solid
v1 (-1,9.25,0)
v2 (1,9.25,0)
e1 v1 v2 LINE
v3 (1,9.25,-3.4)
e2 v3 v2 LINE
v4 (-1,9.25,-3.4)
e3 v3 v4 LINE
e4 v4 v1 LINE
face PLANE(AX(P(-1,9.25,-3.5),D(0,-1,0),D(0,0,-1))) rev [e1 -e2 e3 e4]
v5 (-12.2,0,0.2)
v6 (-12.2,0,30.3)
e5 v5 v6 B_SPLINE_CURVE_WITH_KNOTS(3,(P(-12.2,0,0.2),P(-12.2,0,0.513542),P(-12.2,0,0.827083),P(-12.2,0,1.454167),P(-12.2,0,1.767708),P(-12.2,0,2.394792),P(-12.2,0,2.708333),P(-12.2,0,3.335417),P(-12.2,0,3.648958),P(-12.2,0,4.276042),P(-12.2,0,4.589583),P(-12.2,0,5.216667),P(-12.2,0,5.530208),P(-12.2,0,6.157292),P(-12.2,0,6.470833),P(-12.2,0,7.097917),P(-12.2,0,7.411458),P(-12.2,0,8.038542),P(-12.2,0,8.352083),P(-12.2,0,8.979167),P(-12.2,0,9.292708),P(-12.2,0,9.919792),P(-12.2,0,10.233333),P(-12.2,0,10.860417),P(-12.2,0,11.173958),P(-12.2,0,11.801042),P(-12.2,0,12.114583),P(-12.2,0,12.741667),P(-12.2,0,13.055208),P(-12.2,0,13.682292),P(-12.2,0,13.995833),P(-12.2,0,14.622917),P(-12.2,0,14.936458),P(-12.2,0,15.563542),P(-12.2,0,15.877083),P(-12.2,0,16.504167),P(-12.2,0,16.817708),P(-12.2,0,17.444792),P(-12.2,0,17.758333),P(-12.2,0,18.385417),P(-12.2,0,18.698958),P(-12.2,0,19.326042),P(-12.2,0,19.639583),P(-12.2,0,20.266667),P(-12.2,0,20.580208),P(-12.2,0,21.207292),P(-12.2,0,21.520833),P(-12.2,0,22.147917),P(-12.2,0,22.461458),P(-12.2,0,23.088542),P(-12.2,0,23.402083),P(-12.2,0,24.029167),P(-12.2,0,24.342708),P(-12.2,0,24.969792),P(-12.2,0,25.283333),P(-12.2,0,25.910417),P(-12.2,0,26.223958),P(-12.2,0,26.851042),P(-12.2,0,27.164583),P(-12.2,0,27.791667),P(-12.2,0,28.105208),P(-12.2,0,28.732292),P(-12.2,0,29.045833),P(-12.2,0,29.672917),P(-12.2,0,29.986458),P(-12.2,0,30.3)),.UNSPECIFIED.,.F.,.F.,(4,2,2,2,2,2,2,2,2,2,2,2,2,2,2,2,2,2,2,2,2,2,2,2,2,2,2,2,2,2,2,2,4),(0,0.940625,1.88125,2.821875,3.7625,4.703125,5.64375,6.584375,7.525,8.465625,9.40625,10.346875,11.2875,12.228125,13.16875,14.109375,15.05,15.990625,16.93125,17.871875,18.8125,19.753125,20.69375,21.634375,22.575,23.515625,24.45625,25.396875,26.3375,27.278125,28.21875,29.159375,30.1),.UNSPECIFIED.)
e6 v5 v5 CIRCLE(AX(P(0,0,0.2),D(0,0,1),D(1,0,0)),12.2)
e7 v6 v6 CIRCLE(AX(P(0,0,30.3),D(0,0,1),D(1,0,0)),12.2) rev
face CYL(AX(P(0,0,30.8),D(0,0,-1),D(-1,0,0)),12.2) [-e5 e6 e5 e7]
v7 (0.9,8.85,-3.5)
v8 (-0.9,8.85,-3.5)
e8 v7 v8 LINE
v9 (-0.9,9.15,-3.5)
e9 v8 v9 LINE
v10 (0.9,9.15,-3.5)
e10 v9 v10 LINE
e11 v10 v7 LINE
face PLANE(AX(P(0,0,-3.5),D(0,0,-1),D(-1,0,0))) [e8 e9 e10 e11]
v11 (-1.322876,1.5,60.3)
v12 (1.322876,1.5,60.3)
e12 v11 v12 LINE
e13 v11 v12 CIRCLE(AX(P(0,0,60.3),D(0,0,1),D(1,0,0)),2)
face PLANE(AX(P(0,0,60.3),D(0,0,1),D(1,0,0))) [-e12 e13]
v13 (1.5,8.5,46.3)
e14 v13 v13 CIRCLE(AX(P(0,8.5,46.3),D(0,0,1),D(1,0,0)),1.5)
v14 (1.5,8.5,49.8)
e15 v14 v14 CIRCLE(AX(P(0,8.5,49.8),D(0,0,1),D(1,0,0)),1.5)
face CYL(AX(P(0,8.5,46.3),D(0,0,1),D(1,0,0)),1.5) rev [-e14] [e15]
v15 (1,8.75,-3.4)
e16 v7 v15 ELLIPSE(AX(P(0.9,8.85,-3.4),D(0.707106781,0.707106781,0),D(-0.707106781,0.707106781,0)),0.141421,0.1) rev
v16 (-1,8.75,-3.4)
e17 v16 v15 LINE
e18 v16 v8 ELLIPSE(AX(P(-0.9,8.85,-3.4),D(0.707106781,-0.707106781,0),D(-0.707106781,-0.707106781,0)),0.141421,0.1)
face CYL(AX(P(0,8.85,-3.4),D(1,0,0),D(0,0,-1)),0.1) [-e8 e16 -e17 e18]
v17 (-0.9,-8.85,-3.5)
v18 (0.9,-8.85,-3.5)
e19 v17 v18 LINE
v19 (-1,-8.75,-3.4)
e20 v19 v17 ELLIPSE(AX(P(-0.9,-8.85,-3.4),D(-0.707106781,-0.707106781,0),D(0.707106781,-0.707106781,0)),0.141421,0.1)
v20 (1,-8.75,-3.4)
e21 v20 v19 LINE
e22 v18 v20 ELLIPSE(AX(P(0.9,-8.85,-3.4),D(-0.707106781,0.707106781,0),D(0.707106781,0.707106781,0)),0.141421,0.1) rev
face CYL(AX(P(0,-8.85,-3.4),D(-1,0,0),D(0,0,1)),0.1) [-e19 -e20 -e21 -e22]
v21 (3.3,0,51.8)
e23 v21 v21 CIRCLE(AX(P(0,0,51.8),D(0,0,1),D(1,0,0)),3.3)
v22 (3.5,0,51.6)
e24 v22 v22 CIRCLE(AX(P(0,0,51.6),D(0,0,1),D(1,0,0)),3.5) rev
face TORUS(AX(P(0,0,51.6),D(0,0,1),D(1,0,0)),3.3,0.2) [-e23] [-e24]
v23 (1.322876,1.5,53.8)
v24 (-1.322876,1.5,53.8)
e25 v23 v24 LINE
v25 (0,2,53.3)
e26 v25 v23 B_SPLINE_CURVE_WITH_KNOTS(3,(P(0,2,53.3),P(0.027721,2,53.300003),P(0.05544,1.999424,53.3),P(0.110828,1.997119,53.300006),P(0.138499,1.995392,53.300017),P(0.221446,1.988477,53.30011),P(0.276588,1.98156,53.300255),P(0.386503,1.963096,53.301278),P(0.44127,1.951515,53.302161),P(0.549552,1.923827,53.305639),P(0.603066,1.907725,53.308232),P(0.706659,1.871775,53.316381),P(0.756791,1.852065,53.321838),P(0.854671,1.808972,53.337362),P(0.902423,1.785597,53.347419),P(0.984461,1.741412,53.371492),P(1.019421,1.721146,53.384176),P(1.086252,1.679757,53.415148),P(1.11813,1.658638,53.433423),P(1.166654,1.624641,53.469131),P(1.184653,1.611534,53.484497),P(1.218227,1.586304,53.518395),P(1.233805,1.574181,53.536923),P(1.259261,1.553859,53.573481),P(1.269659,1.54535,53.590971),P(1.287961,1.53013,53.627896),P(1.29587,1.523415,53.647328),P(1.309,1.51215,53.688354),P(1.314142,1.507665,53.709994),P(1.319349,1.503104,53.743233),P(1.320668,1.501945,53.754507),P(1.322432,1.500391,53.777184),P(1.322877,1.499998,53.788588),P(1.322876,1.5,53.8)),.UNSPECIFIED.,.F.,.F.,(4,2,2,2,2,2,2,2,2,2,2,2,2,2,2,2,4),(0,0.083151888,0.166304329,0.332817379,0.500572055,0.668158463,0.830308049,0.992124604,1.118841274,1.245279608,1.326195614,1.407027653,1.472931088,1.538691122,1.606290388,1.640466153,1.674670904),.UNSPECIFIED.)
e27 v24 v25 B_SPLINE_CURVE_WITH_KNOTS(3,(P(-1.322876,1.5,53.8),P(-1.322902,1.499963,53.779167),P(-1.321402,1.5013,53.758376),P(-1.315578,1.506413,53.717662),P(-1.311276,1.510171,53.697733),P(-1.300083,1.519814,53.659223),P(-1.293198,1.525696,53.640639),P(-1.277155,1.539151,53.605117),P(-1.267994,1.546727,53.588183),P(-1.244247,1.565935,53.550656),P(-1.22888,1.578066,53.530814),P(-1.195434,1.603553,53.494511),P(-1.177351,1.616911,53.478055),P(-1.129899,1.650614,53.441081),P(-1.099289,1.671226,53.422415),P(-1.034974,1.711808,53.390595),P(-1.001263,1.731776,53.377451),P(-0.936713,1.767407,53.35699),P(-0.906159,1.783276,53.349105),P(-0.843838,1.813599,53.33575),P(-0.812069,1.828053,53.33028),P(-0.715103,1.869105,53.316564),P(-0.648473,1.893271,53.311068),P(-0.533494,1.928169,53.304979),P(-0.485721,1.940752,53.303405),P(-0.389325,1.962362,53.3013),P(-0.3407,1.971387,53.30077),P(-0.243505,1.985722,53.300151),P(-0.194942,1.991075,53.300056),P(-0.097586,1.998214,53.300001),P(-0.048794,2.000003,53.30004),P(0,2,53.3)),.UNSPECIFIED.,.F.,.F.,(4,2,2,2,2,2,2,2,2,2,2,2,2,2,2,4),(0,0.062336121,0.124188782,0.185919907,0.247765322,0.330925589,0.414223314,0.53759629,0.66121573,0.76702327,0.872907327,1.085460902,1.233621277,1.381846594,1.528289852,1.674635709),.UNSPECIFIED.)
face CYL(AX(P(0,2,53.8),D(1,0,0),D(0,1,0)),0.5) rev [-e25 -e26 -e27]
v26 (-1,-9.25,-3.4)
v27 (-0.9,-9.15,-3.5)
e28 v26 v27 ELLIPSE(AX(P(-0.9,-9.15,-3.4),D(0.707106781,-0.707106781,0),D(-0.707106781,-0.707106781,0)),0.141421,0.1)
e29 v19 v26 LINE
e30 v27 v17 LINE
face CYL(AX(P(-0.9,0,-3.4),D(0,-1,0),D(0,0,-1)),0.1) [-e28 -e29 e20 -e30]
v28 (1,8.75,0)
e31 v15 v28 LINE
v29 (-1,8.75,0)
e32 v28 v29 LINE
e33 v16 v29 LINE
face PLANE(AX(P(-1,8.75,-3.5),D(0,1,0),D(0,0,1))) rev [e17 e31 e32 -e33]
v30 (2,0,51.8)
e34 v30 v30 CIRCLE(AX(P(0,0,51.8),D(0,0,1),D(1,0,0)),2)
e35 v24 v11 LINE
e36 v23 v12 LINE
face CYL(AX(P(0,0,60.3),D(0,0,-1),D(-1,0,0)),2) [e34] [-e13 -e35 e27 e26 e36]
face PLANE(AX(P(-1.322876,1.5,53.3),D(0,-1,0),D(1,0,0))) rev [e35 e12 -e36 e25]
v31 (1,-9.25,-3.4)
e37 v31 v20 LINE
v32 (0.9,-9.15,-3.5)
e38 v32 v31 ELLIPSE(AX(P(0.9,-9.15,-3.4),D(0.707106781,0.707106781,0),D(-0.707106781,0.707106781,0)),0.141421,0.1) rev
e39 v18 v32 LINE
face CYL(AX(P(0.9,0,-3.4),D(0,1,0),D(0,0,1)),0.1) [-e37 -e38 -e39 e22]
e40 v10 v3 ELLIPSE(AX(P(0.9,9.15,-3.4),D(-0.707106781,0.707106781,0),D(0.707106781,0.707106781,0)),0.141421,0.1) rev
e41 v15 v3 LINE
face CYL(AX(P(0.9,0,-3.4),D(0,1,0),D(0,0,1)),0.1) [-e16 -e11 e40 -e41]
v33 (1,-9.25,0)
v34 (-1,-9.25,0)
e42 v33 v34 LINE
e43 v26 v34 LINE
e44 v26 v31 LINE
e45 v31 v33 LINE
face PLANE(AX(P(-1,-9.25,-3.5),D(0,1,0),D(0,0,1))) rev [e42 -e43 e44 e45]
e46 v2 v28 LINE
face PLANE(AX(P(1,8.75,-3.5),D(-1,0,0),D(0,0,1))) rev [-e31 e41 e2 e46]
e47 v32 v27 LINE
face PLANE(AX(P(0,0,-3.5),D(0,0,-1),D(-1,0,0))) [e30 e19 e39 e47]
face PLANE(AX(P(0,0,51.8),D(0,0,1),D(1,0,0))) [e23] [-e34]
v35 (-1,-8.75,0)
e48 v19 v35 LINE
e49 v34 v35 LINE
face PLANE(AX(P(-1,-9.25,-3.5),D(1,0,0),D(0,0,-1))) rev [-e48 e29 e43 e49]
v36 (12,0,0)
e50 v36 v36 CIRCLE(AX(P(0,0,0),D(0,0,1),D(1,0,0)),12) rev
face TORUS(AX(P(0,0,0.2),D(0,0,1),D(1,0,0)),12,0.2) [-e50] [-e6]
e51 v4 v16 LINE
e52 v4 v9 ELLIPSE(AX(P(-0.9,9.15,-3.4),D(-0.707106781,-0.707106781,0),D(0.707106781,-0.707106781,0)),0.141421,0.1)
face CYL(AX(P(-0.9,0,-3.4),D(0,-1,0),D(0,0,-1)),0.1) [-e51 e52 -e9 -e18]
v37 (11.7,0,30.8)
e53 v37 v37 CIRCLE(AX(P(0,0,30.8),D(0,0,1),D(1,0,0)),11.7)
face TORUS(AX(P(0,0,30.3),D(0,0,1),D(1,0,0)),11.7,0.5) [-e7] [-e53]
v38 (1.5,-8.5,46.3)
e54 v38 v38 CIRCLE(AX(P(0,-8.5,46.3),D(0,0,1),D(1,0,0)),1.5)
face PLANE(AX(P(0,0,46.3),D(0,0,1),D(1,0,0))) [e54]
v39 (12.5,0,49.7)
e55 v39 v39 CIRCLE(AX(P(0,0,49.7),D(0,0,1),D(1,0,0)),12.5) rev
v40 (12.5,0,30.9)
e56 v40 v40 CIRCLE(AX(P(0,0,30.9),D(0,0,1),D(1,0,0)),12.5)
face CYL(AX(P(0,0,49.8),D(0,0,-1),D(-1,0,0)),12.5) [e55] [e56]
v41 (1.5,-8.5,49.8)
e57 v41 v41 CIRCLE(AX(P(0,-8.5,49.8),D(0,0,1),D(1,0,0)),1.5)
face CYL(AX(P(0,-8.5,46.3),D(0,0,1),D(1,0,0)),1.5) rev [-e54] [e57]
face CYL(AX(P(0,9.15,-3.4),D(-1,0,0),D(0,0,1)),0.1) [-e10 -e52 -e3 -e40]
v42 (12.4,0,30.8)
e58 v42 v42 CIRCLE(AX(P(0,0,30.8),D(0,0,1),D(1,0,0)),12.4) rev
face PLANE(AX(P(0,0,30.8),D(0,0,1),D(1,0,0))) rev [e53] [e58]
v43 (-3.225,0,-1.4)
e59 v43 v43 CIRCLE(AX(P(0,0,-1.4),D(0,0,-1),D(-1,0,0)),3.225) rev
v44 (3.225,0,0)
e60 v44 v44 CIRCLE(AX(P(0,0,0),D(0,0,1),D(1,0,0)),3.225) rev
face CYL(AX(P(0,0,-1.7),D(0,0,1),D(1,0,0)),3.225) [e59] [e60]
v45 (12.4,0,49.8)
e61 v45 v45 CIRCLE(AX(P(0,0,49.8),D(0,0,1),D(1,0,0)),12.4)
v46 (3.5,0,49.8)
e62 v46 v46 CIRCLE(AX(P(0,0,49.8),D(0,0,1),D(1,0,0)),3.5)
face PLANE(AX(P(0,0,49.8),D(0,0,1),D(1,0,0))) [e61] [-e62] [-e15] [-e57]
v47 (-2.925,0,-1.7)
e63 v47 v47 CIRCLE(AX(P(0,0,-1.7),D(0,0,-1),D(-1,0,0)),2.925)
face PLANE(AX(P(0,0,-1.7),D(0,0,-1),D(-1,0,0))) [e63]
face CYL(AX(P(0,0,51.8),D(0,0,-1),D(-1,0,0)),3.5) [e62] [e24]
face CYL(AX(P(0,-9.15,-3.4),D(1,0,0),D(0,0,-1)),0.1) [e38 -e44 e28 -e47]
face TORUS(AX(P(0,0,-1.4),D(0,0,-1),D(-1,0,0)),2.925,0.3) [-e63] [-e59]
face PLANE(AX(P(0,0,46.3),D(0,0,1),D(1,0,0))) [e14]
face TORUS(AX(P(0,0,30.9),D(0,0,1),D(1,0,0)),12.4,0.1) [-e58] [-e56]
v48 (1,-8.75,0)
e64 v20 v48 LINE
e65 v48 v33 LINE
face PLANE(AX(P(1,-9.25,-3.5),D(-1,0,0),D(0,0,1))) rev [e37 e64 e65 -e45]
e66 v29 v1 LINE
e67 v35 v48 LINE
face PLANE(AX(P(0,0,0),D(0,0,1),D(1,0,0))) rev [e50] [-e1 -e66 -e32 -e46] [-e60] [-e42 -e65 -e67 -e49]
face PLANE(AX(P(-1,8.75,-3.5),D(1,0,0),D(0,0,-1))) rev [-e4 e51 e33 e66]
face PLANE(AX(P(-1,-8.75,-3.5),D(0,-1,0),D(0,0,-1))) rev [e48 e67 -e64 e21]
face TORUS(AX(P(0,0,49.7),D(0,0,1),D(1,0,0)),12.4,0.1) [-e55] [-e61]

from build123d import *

# Parameters (mm, degrees)
IZIM2_R                     = 12.2
Y_KSEKLIK_EKSTR_ZYON1_DEPTH = 30.8
RADYUS1_R                   = 0.5
IZIM3_R                     = 12.5
Y_KSEKLIK_EKSTR_ZYON2_DEPTH = 19
IZIM4_R                     = 3.5
Y_KSEKLIK_EKSTR_ZYON3_DEPTH = 2
IZIM5_R                     = 3.225
Y_KSEKLIK_EKSTR_ZYON4_DEPTH = 1.7
IZIM6_R                     = 2
Y_KSEKLIK_EKSTR_ZYON5_DEPTH = 8.5
KES_EKSTR_ZYON1_START       = -7
KES_EKSTR_ZYON1_DEPTH       = 7
RADYUS2_R                   = 0.5
RADYUS3_R                   = 0.2
RADYUS4_R                   = 0.3
RADYUS5_R                   = 0.2
RADYUS6_R                   = 0.1
RADYUS7_R                   = 0.1
IZIM8_R                     = 1.5
KES_EKSTR_ZYON2_DEPTH       = 3.5
IZIM9_W                     = 2
IZIM9_H                     = 0.5
Y_KSEKLIK_EKSTR_ZYON8_DEPTH = 3.5
RADYUS8_R                   = 0.1


with BuildPart() as part:
    # Çizim2 → Yükseklik-Ekstrüzyon1 (new body)
    with BuildSketch(Plane.XY):
        with Locations(Location((0, 0, 0), (0, 0, 180))):
            Circle(IZIM2_R)
    extrude(amount=Y_KSEKLIK_EKSTR_ZYON1_DEPTH)

    # Radyus1
    radyus1_edges = [part.edges().sort_by_distance(p)[0] for p in [
        (12.2, 0, 30.8),
    ]]
    fillet(radyus1_edges, radius=RADYUS1_R)

    # Çizim3 → Yükseklik-Ekstrüzyon2 (add)
    with BuildSketch(Plane.XY.offset(30.8)):
        Circle(IZIM3_R)
    extrude(amount=Y_KSEKLIK_EKSTR_ZYON2_DEPTH)

    # Çizim4 → Yükseklik-Ekstrüzyon3 (add)
    with BuildSketch(Plane.XY.offset(49.8)):
        Circle(IZIM4_R)
    extrude(amount=Y_KSEKLIK_EKSTR_ZYON3_DEPTH)

    # Çizim5 → Yükseklik-Ekstrüzyon4 (add)
    with BuildSketch(Plane(origin=(0, 0, 0), x_dir=(-1, 0, 0), z_dir=(0, 0, -1))):
        with Locations(Location((0, 0, 0), (0, 0, 180))):
            Circle(IZIM5_R)
    extrude(amount=Y_KSEKLIK_EKSTR_ZYON4_DEPTH)

    # Çizim6 → Yükseklik-Ekstrüzyon5 (add)
    with BuildSketch(Plane.XY.offset(51.8)):
        Circle(IZIM6_R)
    extrude(amount=Y_KSEKLIK_EKSTR_ZYON5_DEPTH)

    # Çizim7 → Kes-Ekstrüzyon1 (cut)
    with BuildSketch(Plane.XY.offset(60.3).offset(KES_EKSTR_ZYON1_START)):
        with BuildLine():
            Line((-1.322875656, 1.5), (1.322875656, 1.5))
            ThreePointArc((1.322875656, 1.5), (0, 2), (-1.322875656, 1.5))
        make_face()
    extrude(amount=KES_EKSTR_ZYON1_DEPTH, mode=Mode.SUBTRACT)

    # Radyus2
    radyus2_edges = [part.edges().sort_by_distance(p)[0] for p in [
        (0, 1.5, 53.3),
    ]]
    fillet(radyus2_edges, radius=RADYUS2_R - 0.0001)  # a hair under: the kernel refuses the full size

    # Radyus3
    radyus3_edges = [part.edges().sort_by_distance(p)[0] for p in [
        (-3.5, 0, 51.8),
    ]]
    fillet(radyus3_edges, radius=RADYUS3_R)

    # Radyus4
    radyus4_edges = [part.edges().sort_by_distance(p)[0] for p in [
        (-3.225, 0, -1.7),
    ]]
    fillet(radyus4_edges, radius=RADYUS4_R)

    # Radyus5
    radyus5_edges = [part.edges().sort_by_distance(p)[0] for p in [
        (12.2, 0, 0),
    ]]
    fillet(radyus5_edges, radius=RADYUS5_R)

    # Radyus6
    radyus6_edges = [part.edges().sort_by_distance(p)[0] for p in [
        (-12.5, 0, 30.8),
    ]]
    fillet(radyus6_edges, radius=RADYUS6_R)

    # Radyus7
    radyus7_edges = [part.edges().sort_by_distance(p)[0] for p in [
        (-12.5, 0, 49.8),
    ]]
    fillet(radyus7_edges, radius=RADYUS7_R)

    # Çizim8 → Kes-Ekstrüzyon2 (cut)
    with BuildSketch(Plane.XY.offset(49.8)):
        with Locations((0, 8.5)):
            Circle(IZIM8_R)
        with Locations((0, -8.5)):
            Circle(IZIM8_R)
    extrude(amount=-KES_EKSTR_ZYON2_DEPTH, mode=Mode.SUBTRACT)

    # Çizim9 → Yükseklik-Ekstrüzyon8 (add)
    with BuildSketch(Plane(origin=(0, 0, 0), x_dir=(-1, 0, 0), z_dir=(0, 0, -1))):
        with Locations((0, 9)):
            Rectangle(IZIM9_W, IZIM9_H)
        with Locations((0, -9)):
            Rectangle(IZIM9_W, IZIM9_H)
    extrude(amount=Y_KSEKLIK_EKSTR_ZYON8_DEPTH)

    # Radyus8
    radyus8_edges = [part.edges().sort_by_distance(p)[0] for p in [
        (1, 9, -3.5),
        (0, 8.75, -3.5),
        (-1, 9, -3.5),
        (0, 9.25, -3.5),
        (1, -9, -3.5),
        (0, -9.25, -3.5),
        (-1, -9, -3.5),
        (0, -8.75, -3.5),
    ]]
    fillet(radyus8_edges, radius=RADYUS8_R)


solid = part.part
